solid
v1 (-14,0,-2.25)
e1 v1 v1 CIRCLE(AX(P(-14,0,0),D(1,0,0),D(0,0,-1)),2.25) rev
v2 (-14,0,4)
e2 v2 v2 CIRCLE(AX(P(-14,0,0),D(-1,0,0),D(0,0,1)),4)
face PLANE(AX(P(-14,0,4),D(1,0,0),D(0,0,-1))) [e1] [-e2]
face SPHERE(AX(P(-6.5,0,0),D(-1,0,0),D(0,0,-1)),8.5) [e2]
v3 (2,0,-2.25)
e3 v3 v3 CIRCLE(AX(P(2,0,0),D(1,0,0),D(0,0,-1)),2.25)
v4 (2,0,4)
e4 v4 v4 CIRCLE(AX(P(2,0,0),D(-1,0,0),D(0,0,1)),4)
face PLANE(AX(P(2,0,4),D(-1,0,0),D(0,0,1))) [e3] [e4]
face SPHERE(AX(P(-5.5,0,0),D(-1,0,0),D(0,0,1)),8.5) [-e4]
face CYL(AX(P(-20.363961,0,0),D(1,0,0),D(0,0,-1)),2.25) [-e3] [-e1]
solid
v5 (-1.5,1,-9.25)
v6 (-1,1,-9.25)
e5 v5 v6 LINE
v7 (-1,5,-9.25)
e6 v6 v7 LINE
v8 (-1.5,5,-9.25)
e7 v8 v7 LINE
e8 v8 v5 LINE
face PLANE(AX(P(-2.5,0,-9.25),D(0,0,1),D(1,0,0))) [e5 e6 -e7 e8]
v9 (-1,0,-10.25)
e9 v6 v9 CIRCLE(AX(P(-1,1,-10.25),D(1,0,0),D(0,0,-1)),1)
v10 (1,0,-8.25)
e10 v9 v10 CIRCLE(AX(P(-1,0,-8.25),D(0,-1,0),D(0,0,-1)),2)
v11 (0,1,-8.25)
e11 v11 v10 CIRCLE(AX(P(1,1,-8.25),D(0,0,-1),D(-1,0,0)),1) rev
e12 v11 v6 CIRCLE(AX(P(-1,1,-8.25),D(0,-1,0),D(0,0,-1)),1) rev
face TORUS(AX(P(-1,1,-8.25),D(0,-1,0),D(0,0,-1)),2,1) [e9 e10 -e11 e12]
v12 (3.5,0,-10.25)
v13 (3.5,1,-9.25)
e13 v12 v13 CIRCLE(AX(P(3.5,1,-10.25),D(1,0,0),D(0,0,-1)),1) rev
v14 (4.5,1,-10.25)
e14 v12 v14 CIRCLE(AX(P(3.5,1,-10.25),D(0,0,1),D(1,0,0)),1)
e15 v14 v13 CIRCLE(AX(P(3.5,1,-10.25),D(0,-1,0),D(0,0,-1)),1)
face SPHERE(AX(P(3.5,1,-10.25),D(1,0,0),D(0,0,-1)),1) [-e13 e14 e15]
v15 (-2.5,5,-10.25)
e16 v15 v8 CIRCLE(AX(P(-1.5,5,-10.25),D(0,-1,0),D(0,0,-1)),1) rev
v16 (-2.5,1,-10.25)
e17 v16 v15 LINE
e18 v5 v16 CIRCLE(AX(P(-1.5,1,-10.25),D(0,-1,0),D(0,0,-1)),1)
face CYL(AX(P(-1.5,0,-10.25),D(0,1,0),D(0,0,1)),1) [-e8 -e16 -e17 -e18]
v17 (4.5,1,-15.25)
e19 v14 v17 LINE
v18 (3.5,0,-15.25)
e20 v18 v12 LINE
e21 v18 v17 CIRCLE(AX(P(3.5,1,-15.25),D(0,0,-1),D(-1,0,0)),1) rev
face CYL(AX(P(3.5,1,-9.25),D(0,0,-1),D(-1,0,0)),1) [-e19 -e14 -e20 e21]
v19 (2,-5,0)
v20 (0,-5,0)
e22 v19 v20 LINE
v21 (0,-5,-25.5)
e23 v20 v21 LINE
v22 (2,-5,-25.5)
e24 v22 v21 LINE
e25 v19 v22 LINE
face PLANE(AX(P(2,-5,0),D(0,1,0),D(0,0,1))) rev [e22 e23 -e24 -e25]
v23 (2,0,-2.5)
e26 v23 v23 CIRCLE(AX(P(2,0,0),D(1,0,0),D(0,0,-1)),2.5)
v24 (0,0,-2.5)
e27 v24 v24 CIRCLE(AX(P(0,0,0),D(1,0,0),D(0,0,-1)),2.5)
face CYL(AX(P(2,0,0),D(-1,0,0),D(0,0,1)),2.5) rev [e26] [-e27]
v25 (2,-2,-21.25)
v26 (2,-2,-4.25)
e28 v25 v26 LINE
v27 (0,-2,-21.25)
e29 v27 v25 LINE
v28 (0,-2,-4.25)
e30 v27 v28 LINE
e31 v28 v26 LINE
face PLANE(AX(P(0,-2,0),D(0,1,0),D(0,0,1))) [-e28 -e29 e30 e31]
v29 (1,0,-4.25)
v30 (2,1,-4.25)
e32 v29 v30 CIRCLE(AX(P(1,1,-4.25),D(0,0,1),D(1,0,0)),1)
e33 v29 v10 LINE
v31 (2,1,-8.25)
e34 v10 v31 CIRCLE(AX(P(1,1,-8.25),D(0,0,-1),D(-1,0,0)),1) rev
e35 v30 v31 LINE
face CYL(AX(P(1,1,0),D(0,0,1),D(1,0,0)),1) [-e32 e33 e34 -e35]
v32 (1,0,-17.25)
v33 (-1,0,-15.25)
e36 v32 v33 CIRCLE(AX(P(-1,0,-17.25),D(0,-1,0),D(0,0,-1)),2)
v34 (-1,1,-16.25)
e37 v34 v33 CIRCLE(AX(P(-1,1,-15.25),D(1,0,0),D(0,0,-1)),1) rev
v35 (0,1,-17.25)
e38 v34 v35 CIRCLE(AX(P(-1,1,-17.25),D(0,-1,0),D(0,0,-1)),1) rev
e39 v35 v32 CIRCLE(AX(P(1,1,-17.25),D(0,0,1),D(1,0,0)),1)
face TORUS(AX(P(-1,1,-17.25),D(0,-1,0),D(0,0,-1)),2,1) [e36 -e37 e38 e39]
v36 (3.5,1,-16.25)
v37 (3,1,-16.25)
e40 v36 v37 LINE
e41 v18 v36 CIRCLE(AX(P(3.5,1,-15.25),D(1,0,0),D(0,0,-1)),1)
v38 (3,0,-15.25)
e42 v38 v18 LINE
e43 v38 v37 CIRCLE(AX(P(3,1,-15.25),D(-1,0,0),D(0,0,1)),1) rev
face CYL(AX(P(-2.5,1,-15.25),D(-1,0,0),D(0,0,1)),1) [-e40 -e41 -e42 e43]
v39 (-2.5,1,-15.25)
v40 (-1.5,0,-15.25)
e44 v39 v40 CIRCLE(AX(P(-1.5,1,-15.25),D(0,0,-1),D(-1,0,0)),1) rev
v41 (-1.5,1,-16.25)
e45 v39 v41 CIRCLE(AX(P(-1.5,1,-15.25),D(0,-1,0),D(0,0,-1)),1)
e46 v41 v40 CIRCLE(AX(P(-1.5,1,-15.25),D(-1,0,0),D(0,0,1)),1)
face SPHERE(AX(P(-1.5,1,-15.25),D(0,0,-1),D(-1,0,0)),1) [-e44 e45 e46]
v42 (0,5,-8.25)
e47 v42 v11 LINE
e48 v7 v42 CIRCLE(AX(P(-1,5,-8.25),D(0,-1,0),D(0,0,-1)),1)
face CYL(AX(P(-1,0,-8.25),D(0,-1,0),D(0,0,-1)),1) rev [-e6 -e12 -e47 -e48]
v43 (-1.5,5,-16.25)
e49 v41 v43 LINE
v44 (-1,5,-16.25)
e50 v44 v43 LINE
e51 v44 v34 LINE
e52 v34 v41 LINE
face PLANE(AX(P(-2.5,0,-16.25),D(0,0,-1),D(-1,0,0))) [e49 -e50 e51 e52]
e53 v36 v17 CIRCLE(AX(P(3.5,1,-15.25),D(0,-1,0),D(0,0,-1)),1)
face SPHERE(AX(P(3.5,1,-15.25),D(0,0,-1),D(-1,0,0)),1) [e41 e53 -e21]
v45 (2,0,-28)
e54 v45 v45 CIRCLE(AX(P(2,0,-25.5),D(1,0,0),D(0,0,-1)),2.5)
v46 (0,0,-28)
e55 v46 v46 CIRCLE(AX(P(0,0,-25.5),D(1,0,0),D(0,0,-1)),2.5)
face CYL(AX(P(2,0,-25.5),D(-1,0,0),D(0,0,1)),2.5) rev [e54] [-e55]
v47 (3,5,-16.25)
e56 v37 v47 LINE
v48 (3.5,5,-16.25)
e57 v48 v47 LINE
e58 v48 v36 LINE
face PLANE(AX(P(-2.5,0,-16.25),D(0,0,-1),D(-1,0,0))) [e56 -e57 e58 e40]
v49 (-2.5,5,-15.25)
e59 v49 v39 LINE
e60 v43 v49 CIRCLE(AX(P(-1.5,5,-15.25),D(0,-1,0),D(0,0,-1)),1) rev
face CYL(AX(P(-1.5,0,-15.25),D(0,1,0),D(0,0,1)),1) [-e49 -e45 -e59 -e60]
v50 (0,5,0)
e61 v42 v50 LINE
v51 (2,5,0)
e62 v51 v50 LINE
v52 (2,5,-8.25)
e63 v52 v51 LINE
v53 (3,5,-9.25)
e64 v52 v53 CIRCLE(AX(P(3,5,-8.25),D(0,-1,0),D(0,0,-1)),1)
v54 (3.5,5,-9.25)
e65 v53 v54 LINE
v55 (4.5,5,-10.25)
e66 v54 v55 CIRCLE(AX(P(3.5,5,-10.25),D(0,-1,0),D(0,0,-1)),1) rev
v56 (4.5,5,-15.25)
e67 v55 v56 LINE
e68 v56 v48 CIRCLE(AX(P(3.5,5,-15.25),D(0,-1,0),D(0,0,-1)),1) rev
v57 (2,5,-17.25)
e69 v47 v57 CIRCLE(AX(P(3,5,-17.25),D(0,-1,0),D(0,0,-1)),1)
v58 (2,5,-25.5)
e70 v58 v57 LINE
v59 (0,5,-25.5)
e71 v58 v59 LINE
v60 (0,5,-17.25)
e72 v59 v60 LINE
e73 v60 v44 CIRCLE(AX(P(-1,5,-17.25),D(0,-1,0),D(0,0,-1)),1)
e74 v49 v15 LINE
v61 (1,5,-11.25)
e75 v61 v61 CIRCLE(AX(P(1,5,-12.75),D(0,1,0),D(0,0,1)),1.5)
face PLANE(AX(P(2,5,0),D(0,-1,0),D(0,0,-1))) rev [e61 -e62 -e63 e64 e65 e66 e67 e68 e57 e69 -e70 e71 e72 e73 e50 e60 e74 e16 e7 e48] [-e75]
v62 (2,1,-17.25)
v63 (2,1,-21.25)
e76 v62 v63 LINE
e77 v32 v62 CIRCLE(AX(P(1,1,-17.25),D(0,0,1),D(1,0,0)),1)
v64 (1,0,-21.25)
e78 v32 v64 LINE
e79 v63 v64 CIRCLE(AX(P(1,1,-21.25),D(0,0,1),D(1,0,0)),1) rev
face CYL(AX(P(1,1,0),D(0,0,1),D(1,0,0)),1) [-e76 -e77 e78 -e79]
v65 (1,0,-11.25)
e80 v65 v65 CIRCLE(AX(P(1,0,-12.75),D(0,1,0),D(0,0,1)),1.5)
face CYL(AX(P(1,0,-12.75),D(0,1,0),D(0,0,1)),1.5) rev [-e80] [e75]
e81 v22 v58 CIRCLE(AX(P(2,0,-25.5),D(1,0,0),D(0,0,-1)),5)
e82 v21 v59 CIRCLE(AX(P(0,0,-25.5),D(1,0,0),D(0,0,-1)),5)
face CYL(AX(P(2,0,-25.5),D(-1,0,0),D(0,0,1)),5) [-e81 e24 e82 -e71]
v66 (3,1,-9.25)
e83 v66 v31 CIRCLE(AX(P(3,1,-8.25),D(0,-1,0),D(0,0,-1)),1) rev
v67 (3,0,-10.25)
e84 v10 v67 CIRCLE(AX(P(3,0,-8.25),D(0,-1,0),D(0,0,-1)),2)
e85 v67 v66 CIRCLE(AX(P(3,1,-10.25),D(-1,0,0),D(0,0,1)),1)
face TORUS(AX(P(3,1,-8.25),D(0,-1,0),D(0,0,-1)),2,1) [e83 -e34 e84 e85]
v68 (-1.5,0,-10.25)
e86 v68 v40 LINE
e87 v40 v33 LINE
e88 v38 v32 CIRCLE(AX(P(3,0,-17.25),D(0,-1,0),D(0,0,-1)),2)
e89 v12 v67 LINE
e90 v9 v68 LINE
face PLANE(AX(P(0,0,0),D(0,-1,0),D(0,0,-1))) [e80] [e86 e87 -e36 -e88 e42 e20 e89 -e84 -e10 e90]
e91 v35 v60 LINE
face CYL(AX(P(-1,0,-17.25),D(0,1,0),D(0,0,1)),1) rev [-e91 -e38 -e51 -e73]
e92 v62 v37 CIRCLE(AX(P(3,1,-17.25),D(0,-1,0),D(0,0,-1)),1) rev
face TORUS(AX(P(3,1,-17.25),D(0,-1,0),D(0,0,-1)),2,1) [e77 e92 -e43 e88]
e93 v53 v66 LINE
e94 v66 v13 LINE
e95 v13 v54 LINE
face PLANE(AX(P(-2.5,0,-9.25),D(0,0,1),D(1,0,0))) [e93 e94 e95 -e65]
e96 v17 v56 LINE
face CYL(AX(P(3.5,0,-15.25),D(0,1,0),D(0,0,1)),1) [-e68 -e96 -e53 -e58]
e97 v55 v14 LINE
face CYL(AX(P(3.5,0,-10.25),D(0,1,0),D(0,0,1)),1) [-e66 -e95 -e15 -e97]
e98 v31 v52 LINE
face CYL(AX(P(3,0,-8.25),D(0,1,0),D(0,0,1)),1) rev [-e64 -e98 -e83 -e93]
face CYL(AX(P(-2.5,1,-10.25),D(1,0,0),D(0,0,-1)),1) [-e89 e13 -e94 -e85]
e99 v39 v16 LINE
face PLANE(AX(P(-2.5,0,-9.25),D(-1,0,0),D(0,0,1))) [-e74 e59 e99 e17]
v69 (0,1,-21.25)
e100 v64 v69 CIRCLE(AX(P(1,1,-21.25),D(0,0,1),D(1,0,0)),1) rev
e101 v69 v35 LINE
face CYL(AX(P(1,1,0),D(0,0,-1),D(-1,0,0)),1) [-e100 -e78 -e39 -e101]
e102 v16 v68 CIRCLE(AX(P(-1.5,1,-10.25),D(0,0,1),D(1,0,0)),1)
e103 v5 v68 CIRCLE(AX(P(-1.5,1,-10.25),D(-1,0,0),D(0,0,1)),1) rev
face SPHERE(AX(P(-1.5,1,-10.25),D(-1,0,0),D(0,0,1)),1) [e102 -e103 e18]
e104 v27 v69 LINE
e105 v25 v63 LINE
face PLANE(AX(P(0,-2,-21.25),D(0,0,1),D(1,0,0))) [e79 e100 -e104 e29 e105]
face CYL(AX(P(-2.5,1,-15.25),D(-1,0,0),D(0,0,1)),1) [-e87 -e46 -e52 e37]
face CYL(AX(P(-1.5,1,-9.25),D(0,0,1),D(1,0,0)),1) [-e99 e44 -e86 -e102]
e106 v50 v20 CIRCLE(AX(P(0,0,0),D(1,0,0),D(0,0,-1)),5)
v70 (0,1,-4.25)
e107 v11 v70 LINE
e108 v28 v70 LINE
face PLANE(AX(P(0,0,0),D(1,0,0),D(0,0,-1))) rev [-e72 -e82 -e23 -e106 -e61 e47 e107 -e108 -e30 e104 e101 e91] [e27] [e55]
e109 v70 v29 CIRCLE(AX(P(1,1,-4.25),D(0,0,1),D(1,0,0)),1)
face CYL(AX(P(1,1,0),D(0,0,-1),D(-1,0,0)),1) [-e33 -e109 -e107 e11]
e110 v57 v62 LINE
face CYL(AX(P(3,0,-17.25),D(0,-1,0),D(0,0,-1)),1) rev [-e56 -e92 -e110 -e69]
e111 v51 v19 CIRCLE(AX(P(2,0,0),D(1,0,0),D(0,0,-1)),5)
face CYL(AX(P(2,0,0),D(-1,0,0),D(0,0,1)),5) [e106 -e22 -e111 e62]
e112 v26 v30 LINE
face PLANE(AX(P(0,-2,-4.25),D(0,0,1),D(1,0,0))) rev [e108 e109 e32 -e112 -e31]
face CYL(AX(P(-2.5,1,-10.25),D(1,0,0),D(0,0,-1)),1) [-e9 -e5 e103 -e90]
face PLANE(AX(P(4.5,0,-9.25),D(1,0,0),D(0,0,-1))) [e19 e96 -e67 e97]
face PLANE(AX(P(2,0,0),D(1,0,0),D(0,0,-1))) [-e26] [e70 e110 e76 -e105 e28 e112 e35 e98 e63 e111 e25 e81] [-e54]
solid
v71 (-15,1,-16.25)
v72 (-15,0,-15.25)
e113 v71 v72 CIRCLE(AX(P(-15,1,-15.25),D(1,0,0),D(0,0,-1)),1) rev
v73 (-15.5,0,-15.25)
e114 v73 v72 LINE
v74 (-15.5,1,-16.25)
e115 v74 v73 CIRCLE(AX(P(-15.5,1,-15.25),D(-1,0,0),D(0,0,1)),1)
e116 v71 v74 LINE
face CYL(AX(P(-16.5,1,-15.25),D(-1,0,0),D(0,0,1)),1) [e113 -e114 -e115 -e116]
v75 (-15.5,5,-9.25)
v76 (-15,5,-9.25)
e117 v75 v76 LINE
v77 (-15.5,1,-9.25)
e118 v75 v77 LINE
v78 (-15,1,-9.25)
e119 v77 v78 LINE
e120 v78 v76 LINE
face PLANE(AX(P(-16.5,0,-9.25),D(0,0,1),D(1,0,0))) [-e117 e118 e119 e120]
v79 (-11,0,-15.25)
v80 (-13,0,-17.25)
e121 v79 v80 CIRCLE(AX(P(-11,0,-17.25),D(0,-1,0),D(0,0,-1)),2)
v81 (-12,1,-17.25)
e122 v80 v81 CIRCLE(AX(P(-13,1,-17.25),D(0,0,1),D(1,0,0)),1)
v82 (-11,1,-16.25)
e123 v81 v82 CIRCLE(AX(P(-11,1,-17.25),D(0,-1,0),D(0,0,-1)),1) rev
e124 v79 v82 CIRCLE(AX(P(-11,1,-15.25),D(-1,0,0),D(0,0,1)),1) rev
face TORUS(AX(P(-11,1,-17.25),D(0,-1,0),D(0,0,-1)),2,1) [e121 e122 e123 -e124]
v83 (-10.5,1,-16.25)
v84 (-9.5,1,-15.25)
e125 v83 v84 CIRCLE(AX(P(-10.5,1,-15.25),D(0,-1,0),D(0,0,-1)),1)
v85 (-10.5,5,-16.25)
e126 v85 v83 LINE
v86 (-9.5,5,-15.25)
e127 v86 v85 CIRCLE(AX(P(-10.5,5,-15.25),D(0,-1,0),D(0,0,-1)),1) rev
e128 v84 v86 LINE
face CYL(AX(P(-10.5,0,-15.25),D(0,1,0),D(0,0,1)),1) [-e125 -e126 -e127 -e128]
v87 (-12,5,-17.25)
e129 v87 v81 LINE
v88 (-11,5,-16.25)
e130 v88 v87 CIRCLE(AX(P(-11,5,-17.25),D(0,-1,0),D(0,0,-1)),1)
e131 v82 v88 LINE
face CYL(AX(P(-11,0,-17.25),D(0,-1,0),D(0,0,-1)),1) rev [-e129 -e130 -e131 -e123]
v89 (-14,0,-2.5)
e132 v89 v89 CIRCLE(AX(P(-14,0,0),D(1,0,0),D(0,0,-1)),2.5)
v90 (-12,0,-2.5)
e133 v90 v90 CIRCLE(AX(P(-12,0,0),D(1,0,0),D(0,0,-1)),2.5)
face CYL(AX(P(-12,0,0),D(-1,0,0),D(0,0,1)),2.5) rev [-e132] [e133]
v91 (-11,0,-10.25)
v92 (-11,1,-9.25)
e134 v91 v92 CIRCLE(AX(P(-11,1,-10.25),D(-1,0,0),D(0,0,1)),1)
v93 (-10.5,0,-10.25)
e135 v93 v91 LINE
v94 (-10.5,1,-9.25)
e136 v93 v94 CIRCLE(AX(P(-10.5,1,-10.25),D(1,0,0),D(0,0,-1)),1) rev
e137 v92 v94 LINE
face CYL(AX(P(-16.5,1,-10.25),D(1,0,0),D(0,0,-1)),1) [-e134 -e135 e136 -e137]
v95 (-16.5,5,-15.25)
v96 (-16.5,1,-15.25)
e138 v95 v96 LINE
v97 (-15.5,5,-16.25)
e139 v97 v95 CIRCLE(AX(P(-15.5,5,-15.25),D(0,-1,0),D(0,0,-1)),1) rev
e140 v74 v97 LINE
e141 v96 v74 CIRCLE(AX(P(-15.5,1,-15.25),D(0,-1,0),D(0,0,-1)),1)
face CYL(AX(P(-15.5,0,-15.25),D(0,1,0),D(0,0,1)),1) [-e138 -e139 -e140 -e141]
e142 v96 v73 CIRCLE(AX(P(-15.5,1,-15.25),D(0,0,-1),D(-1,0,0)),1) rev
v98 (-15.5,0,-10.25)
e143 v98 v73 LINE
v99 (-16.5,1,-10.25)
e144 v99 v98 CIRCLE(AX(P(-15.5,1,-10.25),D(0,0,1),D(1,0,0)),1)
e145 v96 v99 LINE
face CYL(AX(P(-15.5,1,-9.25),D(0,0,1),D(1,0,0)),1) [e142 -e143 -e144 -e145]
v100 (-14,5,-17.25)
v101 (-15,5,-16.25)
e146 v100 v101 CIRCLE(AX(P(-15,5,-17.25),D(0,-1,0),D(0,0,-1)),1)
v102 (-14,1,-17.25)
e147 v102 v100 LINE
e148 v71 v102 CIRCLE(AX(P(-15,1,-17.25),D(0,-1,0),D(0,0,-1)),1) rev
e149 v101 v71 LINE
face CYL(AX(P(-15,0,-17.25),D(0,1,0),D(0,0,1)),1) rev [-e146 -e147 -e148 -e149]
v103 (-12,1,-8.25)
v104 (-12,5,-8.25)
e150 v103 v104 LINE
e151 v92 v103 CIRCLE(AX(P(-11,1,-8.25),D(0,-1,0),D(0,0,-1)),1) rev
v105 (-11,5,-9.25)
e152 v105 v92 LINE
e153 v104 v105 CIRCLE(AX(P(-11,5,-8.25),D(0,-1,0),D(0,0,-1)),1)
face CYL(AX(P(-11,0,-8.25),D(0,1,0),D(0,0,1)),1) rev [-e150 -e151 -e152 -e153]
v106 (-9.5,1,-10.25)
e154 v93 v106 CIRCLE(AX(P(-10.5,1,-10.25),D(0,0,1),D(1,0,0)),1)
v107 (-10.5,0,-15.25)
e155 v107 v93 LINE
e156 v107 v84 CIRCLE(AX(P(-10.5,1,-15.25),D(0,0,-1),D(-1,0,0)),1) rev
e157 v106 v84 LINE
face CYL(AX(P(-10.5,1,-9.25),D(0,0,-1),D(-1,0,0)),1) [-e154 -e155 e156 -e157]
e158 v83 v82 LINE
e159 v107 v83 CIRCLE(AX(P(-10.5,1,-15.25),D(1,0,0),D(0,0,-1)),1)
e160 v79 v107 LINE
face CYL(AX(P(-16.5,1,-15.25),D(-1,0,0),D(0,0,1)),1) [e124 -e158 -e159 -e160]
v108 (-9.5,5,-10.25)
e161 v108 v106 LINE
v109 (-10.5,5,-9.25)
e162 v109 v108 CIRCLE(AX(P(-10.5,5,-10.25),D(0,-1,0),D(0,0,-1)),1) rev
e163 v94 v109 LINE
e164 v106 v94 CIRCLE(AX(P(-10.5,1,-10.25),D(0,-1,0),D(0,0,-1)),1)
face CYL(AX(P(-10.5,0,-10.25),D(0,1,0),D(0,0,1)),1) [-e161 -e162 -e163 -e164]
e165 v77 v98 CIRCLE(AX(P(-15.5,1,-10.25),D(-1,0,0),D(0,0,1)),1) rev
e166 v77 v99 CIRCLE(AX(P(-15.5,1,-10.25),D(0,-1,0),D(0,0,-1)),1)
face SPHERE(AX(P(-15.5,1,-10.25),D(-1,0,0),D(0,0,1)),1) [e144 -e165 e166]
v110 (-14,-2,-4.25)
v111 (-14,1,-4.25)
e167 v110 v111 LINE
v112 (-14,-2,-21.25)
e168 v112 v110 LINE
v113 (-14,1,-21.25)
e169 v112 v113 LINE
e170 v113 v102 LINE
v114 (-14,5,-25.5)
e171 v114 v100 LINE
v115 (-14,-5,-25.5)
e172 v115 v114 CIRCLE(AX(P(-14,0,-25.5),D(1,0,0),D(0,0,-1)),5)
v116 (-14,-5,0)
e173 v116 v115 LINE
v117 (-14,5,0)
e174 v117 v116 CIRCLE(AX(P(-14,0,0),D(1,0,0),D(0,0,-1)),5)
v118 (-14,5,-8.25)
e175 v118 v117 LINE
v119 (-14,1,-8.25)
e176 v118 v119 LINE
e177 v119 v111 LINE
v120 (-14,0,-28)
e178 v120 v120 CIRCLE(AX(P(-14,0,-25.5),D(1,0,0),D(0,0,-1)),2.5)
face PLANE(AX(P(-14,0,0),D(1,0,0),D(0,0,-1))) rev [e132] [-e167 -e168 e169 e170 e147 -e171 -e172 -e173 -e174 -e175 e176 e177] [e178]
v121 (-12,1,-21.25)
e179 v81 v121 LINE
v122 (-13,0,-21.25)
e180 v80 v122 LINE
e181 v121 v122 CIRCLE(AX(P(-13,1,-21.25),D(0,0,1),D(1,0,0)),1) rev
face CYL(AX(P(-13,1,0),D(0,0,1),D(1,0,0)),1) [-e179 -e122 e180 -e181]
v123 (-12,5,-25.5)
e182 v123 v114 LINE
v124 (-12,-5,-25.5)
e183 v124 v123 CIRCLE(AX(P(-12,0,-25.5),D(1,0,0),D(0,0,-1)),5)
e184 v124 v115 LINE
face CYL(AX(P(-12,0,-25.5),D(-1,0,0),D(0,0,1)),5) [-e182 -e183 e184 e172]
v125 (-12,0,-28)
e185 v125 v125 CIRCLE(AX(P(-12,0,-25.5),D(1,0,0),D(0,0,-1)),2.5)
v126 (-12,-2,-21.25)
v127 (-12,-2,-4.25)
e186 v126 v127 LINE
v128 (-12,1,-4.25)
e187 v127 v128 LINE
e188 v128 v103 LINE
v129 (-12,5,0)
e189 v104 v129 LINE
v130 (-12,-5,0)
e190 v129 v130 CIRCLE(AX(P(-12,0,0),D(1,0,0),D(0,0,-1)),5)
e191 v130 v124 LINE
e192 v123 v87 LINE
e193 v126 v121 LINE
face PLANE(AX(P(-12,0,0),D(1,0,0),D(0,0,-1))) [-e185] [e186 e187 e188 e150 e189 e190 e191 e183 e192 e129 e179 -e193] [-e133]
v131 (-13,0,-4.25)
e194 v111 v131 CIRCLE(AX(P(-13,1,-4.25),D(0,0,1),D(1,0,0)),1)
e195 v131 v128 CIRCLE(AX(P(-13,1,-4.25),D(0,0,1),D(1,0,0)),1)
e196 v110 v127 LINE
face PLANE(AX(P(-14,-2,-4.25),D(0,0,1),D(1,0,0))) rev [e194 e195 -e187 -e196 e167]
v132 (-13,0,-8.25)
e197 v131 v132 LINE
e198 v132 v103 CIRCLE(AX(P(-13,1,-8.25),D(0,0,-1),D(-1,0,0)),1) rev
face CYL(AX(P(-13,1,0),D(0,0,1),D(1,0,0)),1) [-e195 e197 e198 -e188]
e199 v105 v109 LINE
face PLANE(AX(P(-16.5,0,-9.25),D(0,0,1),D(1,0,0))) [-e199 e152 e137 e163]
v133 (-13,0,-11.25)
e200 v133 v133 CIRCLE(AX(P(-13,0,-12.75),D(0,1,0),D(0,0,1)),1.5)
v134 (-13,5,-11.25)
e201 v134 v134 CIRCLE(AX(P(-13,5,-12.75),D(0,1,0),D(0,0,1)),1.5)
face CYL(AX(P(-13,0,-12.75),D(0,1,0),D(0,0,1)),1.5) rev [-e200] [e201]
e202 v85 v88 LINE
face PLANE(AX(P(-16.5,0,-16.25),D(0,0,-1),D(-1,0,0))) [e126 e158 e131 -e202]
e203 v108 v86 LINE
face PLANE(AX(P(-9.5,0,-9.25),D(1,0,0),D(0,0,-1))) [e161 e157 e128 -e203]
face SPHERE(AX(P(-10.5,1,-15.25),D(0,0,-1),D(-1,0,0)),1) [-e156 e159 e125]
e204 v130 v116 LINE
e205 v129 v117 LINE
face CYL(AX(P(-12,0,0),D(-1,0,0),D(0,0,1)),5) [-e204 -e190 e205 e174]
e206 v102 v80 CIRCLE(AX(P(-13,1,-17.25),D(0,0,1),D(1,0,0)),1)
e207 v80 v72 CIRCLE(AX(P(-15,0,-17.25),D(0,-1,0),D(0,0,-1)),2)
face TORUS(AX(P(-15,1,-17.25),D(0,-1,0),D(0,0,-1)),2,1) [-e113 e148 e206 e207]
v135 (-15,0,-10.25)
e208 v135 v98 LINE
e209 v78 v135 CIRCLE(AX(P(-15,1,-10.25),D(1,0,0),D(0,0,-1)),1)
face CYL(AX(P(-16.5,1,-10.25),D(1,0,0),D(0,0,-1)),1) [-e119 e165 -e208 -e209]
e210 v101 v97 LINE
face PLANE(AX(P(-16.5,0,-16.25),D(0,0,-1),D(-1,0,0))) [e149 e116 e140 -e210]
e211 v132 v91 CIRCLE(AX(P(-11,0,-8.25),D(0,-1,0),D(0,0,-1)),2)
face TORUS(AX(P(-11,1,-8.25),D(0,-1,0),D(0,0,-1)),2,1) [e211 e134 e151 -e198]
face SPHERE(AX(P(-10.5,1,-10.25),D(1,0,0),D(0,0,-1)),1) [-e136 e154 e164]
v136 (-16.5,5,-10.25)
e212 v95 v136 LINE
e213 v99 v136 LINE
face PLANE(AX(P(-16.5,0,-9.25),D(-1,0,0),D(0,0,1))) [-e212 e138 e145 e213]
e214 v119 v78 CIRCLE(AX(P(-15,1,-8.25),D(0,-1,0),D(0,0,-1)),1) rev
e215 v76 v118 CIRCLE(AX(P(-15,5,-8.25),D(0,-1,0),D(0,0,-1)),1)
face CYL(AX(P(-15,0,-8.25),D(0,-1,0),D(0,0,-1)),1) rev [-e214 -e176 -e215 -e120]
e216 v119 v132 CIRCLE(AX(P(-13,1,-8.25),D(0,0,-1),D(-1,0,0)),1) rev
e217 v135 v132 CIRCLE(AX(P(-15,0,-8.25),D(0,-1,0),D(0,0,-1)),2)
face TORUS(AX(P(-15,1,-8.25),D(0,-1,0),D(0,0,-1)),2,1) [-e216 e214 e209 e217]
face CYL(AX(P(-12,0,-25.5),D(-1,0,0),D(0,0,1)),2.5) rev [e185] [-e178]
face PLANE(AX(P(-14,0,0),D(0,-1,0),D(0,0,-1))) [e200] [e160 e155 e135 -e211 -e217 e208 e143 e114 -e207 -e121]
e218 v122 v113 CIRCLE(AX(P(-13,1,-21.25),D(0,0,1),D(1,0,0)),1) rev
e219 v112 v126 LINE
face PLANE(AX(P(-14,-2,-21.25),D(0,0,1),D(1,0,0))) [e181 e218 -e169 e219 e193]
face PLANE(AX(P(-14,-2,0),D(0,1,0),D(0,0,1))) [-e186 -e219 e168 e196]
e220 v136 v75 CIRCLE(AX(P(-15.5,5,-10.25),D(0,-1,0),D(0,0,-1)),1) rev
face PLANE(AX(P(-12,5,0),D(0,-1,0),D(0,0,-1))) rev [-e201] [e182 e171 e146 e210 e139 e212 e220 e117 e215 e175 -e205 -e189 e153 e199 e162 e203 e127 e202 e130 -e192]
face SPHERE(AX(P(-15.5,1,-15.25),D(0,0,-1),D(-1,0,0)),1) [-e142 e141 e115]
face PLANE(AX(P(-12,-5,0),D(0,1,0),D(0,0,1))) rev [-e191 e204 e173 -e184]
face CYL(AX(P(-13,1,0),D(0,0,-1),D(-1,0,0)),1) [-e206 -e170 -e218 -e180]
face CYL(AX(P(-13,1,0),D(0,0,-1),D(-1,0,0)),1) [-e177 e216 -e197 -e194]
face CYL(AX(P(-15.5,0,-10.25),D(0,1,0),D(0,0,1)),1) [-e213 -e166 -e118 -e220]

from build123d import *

# Parameters (mm, degrees)
SKETCH8_R           = 2.5
BOSS_EXTRUDE4_DEPTH = 2
SKETCH9_W           = 7
SKETCH9_H           = 7
BOSS_EXTRUDE5_DEPTH = 5
SKETCH10_R          = 1.5
CUT_EXTRUDE3_DEPTH  = 5
SKETCH11_W          = 2
SKETCH11_H          = 17
CUT_EXTRUDE4_DEPTH  = 2
FILLET3_R           = 1
LPATTERN2_COUNT     = 2
LPATTERN2_PITCH     = 14
SKETCH12_R          = 2.25
BOSS_EXTRUDE6_DEPTH = 16


with BuildPart() as part:
    # Sketch8 → Boss-Extrude4 (new body)
    with BuildSketch(Plane(origin=(0, 0, 0), x_dir=(0, 0, -1), z_dir=(1, 0, 0))):
        with BuildLine():
            Line((0, 5), (25.5, 5))
            ThreePointArc((25.5, 5), (30.5, 0), (25.5, -5))
            Line((25.5, -5), (0, -5))
            ThreePointArc((0, -5), (-5, 0), (0, 5))
        make_face()
        Circle(SKETCH8_R, mode=Mode.SUBTRACT)
        with Locations((25.5, 0)):
            Circle(SKETCH8_R, mode=Mode.SUBTRACT)
    extrude(amount=BOSS_EXTRUDE4_DEPTH)

    # Sketch9 → Boss-Extrude5 (add)
    with BuildSketch(Plane(origin=(0, 5, 0), x_dir=(1, 0, 0), z_dir=(0, 1, 0))):
        with Locations((1, 12.75)):
            Rectangle(SKETCH9_W, SKETCH9_H)
    extrude(amount=-BOSS_EXTRUDE5_DEPTH)

    # Sketch10 → Cut-Extrude3 (cut)
    with BuildSketch(Plane(origin=(0, 5, 0), x_dir=(1, 0, 0), z_dir=(0, 1, 0))):
        with Locations(Location((1, 12.75, 0), (0, 0, 270))):
            Circle(SKETCH10_R)
    extrude(amount=-CUT_EXTRUDE3_DEPTH, mode=Mode.SUBTRACT)

    # Sketch11 → Cut-Extrude4 (cut)
    with BuildSketch(Plane.XZ):
        with Locations((1, -12.75)):
            Rectangle(SKETCH11_W, SKETCH11_H)
    extrude(amount=CUT_EXTRUDE4_DEPTH, mode=Mode.SUBTRACT)

    # Fillet3
    fillet3_edges = [part.edges().sort_by_distance(p)[0] for p in [
        (2, 0, -6.75),
        (0, 0, -18.75),
        (0, 0, -6.75),
        (2, 0, -18.75),
        (3.25, 0, -16.25),
        (3.25, 0, -9.25),
        (4.5, 0, -12.75),
        (4.5, 2.5, -16.25),
        (4.5, 2.5, -9.25),
        (2, 2.5, -9.25),
        (-1.25, 0, -16.25),
        (-1.25, 0, -9.25),
        (-2.5, 0, -12.75),
        (-2.5, 2.5, -16.25),
        (-2.5, 2.5, -9.25),
        (0, 2.5, -9.25),
        (0, 2.5, -16.25),
        (2, 2.5, -16.25),
    ]]
    fillet(fillet3_edges, radius=FILLET3_R - 0.0001)  # a hair under: the kernel refuses the full size


with BuildPart() as lpattern2_1:
    # LPattern2: pattern copy
    add(part.part.moved(Location(Vector(-1, 0, 0) * (1 * LPATTERN2_PITCH))))


with BuildPart() as body_3:
    # Sketch12 → Boss-Extrude6 (new body)
    with BuildSketch(Plane(origin=(2, 0, 0), x_dir=(0, 0, -1), z_dir=(1, 0, 0))):
        Circle(SKETCH12_R)
    extrude(amount=-BOSS_EXTRUDE6_DEPTH)

    # Sketch13 → Revolve5 (revolve)
    with BuildSketch(Plane(origin=(0, 0, 0), x_dir=(1, 0, 0), z_dir=(0, 1, 0))):
        with BuildLine():
            Line((2, 0), (3, 0))
            ThreePointArc((3, 0), (2.746211251, -2.061552813), (2, -4))
            Line((2, -4), (2, 0))
        make_face()
        with BuildLine():
            Line((-14, 0), (-15, 0))
            ThreePointArc((-15, 0), (-14.746211251, -2.061552813), (-14, -4))
            Line((-14, -4), (-14, 0))
        make_face()
    revolve(axis=Axis((2, 0, 0), (1, 0, 0)))


solid = Compound([part.part, lpattern2_1.part, body_3.part])
